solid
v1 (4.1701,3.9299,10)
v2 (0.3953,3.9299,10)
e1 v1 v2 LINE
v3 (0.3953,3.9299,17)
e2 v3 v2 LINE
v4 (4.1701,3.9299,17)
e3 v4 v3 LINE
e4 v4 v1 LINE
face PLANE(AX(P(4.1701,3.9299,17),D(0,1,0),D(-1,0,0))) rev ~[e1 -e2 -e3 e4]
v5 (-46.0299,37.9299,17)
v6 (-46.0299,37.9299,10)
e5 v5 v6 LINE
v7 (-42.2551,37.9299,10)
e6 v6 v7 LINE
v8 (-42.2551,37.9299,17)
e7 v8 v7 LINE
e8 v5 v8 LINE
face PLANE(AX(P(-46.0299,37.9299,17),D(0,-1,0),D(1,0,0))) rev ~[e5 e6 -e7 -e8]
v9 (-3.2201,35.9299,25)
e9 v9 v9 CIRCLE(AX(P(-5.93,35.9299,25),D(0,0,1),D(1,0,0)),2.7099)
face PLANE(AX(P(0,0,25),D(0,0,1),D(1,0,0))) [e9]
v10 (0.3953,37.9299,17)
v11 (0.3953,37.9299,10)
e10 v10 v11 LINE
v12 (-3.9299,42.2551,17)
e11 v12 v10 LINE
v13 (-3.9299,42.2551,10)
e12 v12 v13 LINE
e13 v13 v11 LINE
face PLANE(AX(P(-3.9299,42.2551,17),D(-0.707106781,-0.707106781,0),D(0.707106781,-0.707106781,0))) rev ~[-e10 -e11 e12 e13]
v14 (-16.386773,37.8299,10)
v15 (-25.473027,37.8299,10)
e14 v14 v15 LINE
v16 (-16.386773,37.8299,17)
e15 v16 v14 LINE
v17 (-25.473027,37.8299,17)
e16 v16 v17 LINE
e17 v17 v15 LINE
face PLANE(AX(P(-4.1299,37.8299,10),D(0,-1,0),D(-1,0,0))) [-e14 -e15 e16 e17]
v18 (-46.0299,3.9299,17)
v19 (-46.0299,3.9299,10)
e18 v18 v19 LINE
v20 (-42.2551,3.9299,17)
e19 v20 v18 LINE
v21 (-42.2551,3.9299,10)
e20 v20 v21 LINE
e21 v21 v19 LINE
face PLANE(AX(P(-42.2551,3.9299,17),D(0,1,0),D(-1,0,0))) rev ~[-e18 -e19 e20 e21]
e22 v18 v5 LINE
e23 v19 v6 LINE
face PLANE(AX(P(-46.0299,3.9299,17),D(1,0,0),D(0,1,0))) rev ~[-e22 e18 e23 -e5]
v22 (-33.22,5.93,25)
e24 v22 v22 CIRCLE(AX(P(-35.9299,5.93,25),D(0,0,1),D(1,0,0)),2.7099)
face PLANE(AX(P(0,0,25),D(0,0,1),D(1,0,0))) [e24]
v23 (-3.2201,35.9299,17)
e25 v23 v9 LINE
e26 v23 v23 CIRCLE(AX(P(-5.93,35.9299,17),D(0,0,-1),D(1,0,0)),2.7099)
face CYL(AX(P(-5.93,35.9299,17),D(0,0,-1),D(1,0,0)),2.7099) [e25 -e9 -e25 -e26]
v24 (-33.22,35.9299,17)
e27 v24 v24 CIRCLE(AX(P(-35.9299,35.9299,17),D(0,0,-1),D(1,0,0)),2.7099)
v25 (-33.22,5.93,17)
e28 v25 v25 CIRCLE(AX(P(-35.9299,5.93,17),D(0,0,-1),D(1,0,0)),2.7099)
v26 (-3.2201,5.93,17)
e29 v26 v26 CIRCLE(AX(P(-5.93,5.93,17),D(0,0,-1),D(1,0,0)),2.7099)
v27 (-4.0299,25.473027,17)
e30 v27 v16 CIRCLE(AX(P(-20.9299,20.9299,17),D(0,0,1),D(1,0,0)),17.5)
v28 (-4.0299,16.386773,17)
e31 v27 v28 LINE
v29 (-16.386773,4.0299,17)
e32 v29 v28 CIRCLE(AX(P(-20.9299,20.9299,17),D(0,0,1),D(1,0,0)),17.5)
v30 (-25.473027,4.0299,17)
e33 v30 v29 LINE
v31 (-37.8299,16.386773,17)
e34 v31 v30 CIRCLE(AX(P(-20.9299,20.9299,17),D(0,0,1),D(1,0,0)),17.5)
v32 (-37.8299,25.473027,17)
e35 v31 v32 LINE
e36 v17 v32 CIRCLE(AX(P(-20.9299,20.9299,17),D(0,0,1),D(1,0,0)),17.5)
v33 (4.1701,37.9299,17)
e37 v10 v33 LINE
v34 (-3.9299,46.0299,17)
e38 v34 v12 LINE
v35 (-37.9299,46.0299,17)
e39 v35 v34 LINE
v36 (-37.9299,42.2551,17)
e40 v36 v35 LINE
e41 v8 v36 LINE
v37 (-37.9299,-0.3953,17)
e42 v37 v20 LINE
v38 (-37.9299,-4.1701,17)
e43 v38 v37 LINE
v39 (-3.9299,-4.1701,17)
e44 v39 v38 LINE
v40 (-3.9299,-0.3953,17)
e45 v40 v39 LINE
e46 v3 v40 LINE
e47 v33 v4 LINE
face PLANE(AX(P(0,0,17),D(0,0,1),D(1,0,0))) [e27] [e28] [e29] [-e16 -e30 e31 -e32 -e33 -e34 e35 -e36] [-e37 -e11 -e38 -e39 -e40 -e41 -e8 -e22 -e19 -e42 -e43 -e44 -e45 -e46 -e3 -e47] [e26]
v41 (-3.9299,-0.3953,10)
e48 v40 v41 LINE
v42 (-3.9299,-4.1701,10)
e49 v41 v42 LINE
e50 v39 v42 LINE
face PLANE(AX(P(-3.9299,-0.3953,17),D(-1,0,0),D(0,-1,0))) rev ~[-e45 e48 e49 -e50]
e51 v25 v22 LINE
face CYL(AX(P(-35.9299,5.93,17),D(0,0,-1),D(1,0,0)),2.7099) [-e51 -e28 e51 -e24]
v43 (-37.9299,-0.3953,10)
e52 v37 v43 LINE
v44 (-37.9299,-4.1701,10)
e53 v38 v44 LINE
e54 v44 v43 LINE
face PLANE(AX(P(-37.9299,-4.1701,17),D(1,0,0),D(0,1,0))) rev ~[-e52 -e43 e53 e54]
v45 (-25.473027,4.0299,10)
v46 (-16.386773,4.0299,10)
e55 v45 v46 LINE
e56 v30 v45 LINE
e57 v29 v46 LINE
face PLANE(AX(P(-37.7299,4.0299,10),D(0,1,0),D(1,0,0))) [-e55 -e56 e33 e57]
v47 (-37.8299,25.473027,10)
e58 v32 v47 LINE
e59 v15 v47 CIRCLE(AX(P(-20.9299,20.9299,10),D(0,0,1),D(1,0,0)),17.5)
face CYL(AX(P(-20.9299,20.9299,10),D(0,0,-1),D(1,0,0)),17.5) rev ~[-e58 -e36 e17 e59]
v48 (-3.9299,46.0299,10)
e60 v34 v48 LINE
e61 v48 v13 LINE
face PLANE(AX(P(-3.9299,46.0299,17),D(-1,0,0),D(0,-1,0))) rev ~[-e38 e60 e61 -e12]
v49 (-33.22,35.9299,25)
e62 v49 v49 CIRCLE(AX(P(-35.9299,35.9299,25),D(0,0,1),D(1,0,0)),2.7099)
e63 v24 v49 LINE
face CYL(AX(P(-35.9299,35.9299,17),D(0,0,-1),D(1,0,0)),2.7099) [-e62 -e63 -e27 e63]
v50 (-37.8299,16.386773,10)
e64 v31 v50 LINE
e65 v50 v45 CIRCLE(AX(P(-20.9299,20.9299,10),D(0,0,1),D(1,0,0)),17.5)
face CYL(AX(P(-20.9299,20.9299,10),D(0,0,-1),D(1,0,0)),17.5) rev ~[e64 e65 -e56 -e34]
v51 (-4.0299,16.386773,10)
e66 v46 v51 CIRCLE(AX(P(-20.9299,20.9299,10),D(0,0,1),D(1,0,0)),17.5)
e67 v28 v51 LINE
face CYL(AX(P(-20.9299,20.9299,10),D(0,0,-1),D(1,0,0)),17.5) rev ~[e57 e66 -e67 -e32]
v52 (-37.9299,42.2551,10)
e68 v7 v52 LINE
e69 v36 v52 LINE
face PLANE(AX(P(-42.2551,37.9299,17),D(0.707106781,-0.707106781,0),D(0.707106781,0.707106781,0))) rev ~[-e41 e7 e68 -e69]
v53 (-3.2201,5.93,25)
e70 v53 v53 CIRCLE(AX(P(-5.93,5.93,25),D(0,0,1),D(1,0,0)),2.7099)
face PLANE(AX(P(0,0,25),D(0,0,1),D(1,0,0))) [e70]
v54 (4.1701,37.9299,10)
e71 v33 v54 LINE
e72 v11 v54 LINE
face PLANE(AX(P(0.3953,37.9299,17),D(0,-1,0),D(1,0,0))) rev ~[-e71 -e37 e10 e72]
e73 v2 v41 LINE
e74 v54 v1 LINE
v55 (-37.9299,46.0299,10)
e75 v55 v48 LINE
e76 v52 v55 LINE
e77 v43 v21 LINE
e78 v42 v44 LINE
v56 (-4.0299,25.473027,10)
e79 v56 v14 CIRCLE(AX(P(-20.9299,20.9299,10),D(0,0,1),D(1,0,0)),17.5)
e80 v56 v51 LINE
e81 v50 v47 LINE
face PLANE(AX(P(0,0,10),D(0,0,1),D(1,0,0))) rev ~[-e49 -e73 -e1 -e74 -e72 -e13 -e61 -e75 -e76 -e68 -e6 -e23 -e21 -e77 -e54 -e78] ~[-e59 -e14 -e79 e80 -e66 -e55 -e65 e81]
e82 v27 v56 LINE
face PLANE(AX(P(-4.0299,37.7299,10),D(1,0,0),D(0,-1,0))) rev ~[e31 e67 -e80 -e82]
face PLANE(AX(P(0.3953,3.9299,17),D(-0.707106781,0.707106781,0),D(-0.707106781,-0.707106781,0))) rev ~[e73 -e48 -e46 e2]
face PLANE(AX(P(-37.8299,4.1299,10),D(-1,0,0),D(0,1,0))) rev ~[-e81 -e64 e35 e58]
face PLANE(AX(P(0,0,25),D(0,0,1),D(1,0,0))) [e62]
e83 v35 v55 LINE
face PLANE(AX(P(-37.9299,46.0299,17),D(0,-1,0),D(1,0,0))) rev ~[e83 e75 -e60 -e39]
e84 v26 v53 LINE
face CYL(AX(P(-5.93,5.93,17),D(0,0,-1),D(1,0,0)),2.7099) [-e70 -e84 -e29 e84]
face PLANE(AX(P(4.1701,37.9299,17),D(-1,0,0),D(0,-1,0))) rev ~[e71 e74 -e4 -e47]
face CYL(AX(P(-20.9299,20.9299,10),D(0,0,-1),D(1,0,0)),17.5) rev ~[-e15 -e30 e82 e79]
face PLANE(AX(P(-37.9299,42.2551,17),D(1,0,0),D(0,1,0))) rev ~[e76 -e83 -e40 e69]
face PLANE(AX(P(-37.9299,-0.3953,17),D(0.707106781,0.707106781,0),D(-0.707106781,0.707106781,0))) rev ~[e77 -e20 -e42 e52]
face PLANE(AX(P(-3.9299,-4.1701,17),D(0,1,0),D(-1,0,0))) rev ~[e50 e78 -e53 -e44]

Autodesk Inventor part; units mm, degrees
ref_plane "YZ Plane" through (0, 0, 0) normal (1, 0, 0) x (0, 1, 0)
ref_plane "XZ Plane" through (0, 0, 0) normal (0, 1, 0) x (-1, 0, 0)
ref_plane "Work Plane1" through (0, 0, 10) normal (0, 0, 1) x (1, 0, 0)
sketch "Sketch1" plane through (0, 0, 10) normal (0, 0, 1) x (1, 0, 0)
  line L0 (-4.0299, -0.3538) -> (-2.2322, 1.4439) construction
  arc A0 (-1.4439, 2.2322) -> (-2.2322, 1.4439) centre (-0.9299, 0.9299) ccw construction
  line L1 (-1.4439, 2.2322) -> (0.3538, 4.0299) construction
  line L2 (-37.8299, 42.8299) -> (-37.8299, 37.8299) construction
  line L3 (-37.8299, 37.8299) -> (-42.9208, 37.8299) construction
  line L4 (-37.8299, 42.2137) -> (-37.8299, 45.8299) construction
  line L5 (-37.8299, 45.8299) -> (-4.0299, 45.8299) construction
  line L6 (-4.0299, 45.8299) -> (-4.0299, 42.2137) construction
  line L7 (-4.0299, 4.0299) -> (0.3538, 4.0299) projected
  circle A1 centre (-20.9299, 20.9299) radius 17.5 projected
  line L8 (-20.9299, 58.9723) -> (17.1124, 20.9299) construction
  line L9 (17.1124, 20.9299) -> (-20.9299, -17.1124) construction
  line L10 (-20.9299, -17.1124) -> (-58.9723, 20.9299) construction
  line L11 (-58.9723, 20.9299) -> (-20.9299, 58.9723) construction
  line L12 (-20.9299, 58.9723) -> (-20.9299, -17.1124) construction
  line L13 (17.1124, 20.9299) -> (-58.9723, 20.9299) construction
  line L14 (-20.9299, 58.9723) -> (32.8701, 58.9723) construction
  line L15 (-43.4299, 43.4299) -> (1.5701, 43.4299) construction
  line L16 (1.5701, 43.4299) -> (1.5701, -1.5701) construction
  line L17 (1.5701, -1.5701) -> (-43.4299, -1.5701) construction
  line L18 (-43.4299, -1.5701) -> (-43.4299, 43.4299) construction
  line L19 (-43.4299, 43.4299) -> (1.5701, -1.5701) construction
  line L20 (1.5701, 43.4299) -> (-43.4299, -1.5701) construction
  line L21 (-43.4299, 5.3876) -> (-43.4299, 36.4723)
  line L22 (-43.4299, 36.4723) -> (-36.4723, 43.4299)
  line L23 (-36.4723, 43.4299) -> (-5.3876, 43.4299)
  line L24 (-5.3876, 43.4299) -> (1.5701, 36.4723)
  line L25 (1.5701, 36.4723) -> (1.5701, 5.3876)
  line L26 (1.5701, 5.3876) -> (-5.3876, -1.5701)
  line L27 (-5.3876, -1.5701) -> (-36.4723, -1.5701)
  line L28 (-36.4723, -1.5701) -> (-43.4299, 5.3876)
  line L29 (-4.0299, 42.2137) -> (-37.8299, 42.2137) projected
  line L30 (-4.0299, -0.3538) -> (-4.0299, 4.0299) projected
  point P0 (-37.8299, 4.0299)
  point P1 (-20.9299, 20.9299)
  dimension "d18" = 53.8
  dimension "d19" = 45
  dimension "d20" = 53.8
  dimension "d21" = 45
  dimension "d22" = 45
extrude "Extrusion1" add sketch "Sketch1" along normal blind 7
sketch "Sketch2" plane through (0, 0, 17) normal (0, 0, 1) x (1, 0, 0)
  circle A0 centre (-35.9299, 35.9299) radius 3.0099 construction
  circle A1 centre (-5.93, 35.9299) radius 3.0099 construction
  circle A2 centre (-5.93, 5.93) radius 3.0099 construction
  circle A3 centre (-35.9299, 5.93) radius 3.0099 construction
  circle A4 centre (-35.9299, 35.9299) radius 2.7099
  circle A5 centre (-5.93, 35.9299) radius 2.7099
  circle A6 centre (-5.93, 5.93) radius 2.7099
  circle A7 centre (-35.9299, 5.93) radius 2.7099
  point P0 (0, 0)
  dimension "d_1" = 0.3
  dimension "d13" = 0.3
  dimension "d14" = 0.3
  dimension "d15" = 0.3
ref_plane "Work Plane2" through (-40.9959, 0.8639, 22.2359) normal (0, 0, 1) x (1, 0, 0)
extrude "Extrusion2" add sketch "Sketch2" along normal blind 8
sketch "Sketch3" plane through (0, 0, 10) normal (0, 0, -1) x (-1, 0, 0)
  line L0 (37.8299, -0.4701) -> (37.8299, 4.0299) construction
  line L1 (4.0299, 4.0299) -> (4.0299, -0.4701) construction
  line L2 (37.8299, -0.4701) -> (37.8299, 1.1886) construction
  line L3 (4.0299, -3.9701) -> (4.0299, -0.3538) construction
  line L4 (45.8299, 4.0299) -> (42.2137, 4.0299) construction
  line L5 (-0.3538, 4.0299) -> (-3.9701, 4.0299) construction
  line L6 (-3.9701, 37.8299) -> (-0.3538, 37.8299) construction
  line L7 (4.0299, 42.2137) -> (4.0299, 45.8299) construction
  line L8 (37.8299, 45.8299) -> (37.8299, 42.2137) construction
  line L9 (42.2137, 37.8299) -> (45.8299, 37.8299) construction
  line L10 (37.8299, 37.7299) -> (45.8299, 37.7299)
  line L11 (45.8299, 37.7299) -> (45.8299, 4.1299)
  line L12 (45.8299, 4.1299) -> (37.8299, 4.1299)
  line L13 (37.8299, 4.1299) -> (37.8299, 37.7299)
  line L14 (37.7299, 4.0299) -> (4.1299, 4.0299)
  line L15 (4.1299, 4.0299) -> (4.1299, -3.9701)
  line L16 (4.1299, -3.9701) -> (37.7299, -3.9701)
  line L17 (37.7299, -3.9701) -> (37.7299, 4.0299)
  line L18 (4.0299, 4.1299) -> (-3.9701, 4.1299)
  line L19 (-3.9701, 4.1299) -> (-3.9701, 37.7299)
  line L20 (-3.9701, 37.7299) -> (4.0299, 37.7299)
  line L21 (4.0299, 37.7299) -> (4.0299, 4.1299)
  line L22 (4.1299, 37.8299) -> (37.7299, 37.8299)
  line L23 (37.7299, 37.8299) -> (37.7299, 45.8299)
  line L24 (37.7299, 45.8299) -> (4.1299, 45.8299)
  line L25 (4.1299, 45.8299) -> (4.1299, 37.8299)
  point P0 (0, 0)
  dimension "d23" = 0.1
  dimension "d24" = 0.1
  dimension "d25" = 0.1
  dimension "d26" = 0.1
  dimension "d27" = 0.1
extrude "Extrusion3" add sketch "Sketch3" against normal up to surface (7 mm away)
sketch "Sketch4" plane through (0, 0, 17) normal (0, 0, 1) x (1, 0, 0)
  arc A0 (-16.3868, 4.0299) -> (-4.0299, 16.3868) centre (-20.9299, 20.9299) ccw projected
  line L0 (-25.4731, 4.0299) -> (-16.3868, 4.0299) projected
  arc A1 (-37.8299, 16.3868) -> (-25.4731, 4.0299) centre (-20.9299, 20.9299) ccw projected
  line L1 (-37.8299, 25.4731) -> (-37.8299, 16.3868) projected
  arc A2 (-25.4731, 37.8299) -> (-37.8299, 25.4731) centre (-20.9299, 20.9299) ccw projected
  line L2 (-16.3868, 37.8299) -> (-25.4731, 37.8299) projected
  arc A3 (-4.0299, 25.4731) -> (-16.3868, 37.8299) centre (-20.9299, 20.9299) ccw projected
  line L3 (-4.0299, 16.3868) -> (-4.0299, 25.4731) projected
  circle A4 centre (-5.93, 5.93) radius 2.7099 projected
  circle A5 centre (-5.93, 35.9299) radius 2.7099 projected
  circle A6 centre (-35.9299, 35.9299) radius 2.7099 projected
  circle A7 centre (-35.9299, 5.93) radius 2.7099 projected
  line L4 (3.9701, 4.1299) -> (0.3124, 4.1299) projected
  line L5 (3.9701, 37.7299) -> (3.9701, 4.1299) projected
  line L6 (0.3124, 37.7299) -> (3.9701, 37.7299) projected
  line L7 (0.3124, 37.7299) -> (-4.1299, 42.1723) projected
  line L8 (-4.1299, 45.8299) -> (-4.1299, 42.1723) projected
  line L9 (-37.7299, 45.8299) -> (-4.1299, 45.8299) projected
  line L10 (-37.7299, 42.1723) -> (-37.7299, 45.8299) projected
  line L11 (-37.7299, 42.1723) -> (-42.1723, 37.7299) projected
  line L12 (-45.8299, 37.7299) -> (-42.1723, 37.7299) projected
  line L13 (-45.8299, 4.1299) -> (-45.8299, 37.7299) projected
  line L14 (-42.1723, 4.1299) -> (-45.8299, 4.1299) projected
  line L15 (-42.1723, 4.1299) -> (-37.7299, -0.3124) projected
  line L16 (-37.7299, -3.9701) -> (-37.7299, -0.3124) projected
  line L17 (-4.1299, -3.9701) -> (-37.7299, -3.9701) projected
  line L18 (-4.1299, -0.3124) -> (-4.1299, -3.9701) projected
  line L19 (-4.1299, -0.3124) -> (0.3124, 4.1299) projected
  line L20 (-3.9299, 46.0299) -> (-3.9299, 42.2551)
  line L21 (-3.9299, 42.2551) -> (0.3953, 37.9299)
  line L22 (0.3953, 37.9299) -> (4.1701, 37.9299)
  line L23 (4.1701, 37.9299) -> (4.1701, 3.9299)
  line L24 (4.1701, 3.9299) -> (0.3953, 3.9299)
  line L25 (0.3953, 3.9299) -> (-3.9299, -0.3953)
  line L26 (-3.9299, -0.3953) -> (-3.9299, -4.1701)
  line L27 (-3.9299, -4.1701) -> (-37.9299, -4.1701)
  line L28 (-37.9299, -4.1701) -> (-37.9299, -0.3953)
  line L29 (-37.9299, -0.3953) -> (-42.2551, 3.9299)
  line L30 (-42.2551, 3.9299) -> (-46.0299, 3.9299)
  line L31 (-46.0299, 3.9299) -> (-46.0299, 37.9299)
  line L32 (-46.0299, 37.9299) -> (-42.2551, 37.9299)
  line L33 (-42.2551, 37.9299) -> (-37.9299, 42.2551)
  line L34 (-37.9299, 42.2551) -> (-37.9299, 46.0299)
  line L35 (-37.9299, 46.0299) -> (-3.9299, 46.0299)
  point P0 (0, 0)
  dimension "d30" = 0.2
extrude "Extrusion4" add sketch "Sketch4" against normal up to surface (7 mm away) contours L20 L21 L22 L23 L24 L25 L26 L27 L28 L29 L30 L31 L32 L33 L34 L35
equation "\"d13\" = d_1"
equation "\"d14\" = d_1"
equation "\"d15\" = d_1"
properties part number "50_Cube_Insert_Thorlabs"
